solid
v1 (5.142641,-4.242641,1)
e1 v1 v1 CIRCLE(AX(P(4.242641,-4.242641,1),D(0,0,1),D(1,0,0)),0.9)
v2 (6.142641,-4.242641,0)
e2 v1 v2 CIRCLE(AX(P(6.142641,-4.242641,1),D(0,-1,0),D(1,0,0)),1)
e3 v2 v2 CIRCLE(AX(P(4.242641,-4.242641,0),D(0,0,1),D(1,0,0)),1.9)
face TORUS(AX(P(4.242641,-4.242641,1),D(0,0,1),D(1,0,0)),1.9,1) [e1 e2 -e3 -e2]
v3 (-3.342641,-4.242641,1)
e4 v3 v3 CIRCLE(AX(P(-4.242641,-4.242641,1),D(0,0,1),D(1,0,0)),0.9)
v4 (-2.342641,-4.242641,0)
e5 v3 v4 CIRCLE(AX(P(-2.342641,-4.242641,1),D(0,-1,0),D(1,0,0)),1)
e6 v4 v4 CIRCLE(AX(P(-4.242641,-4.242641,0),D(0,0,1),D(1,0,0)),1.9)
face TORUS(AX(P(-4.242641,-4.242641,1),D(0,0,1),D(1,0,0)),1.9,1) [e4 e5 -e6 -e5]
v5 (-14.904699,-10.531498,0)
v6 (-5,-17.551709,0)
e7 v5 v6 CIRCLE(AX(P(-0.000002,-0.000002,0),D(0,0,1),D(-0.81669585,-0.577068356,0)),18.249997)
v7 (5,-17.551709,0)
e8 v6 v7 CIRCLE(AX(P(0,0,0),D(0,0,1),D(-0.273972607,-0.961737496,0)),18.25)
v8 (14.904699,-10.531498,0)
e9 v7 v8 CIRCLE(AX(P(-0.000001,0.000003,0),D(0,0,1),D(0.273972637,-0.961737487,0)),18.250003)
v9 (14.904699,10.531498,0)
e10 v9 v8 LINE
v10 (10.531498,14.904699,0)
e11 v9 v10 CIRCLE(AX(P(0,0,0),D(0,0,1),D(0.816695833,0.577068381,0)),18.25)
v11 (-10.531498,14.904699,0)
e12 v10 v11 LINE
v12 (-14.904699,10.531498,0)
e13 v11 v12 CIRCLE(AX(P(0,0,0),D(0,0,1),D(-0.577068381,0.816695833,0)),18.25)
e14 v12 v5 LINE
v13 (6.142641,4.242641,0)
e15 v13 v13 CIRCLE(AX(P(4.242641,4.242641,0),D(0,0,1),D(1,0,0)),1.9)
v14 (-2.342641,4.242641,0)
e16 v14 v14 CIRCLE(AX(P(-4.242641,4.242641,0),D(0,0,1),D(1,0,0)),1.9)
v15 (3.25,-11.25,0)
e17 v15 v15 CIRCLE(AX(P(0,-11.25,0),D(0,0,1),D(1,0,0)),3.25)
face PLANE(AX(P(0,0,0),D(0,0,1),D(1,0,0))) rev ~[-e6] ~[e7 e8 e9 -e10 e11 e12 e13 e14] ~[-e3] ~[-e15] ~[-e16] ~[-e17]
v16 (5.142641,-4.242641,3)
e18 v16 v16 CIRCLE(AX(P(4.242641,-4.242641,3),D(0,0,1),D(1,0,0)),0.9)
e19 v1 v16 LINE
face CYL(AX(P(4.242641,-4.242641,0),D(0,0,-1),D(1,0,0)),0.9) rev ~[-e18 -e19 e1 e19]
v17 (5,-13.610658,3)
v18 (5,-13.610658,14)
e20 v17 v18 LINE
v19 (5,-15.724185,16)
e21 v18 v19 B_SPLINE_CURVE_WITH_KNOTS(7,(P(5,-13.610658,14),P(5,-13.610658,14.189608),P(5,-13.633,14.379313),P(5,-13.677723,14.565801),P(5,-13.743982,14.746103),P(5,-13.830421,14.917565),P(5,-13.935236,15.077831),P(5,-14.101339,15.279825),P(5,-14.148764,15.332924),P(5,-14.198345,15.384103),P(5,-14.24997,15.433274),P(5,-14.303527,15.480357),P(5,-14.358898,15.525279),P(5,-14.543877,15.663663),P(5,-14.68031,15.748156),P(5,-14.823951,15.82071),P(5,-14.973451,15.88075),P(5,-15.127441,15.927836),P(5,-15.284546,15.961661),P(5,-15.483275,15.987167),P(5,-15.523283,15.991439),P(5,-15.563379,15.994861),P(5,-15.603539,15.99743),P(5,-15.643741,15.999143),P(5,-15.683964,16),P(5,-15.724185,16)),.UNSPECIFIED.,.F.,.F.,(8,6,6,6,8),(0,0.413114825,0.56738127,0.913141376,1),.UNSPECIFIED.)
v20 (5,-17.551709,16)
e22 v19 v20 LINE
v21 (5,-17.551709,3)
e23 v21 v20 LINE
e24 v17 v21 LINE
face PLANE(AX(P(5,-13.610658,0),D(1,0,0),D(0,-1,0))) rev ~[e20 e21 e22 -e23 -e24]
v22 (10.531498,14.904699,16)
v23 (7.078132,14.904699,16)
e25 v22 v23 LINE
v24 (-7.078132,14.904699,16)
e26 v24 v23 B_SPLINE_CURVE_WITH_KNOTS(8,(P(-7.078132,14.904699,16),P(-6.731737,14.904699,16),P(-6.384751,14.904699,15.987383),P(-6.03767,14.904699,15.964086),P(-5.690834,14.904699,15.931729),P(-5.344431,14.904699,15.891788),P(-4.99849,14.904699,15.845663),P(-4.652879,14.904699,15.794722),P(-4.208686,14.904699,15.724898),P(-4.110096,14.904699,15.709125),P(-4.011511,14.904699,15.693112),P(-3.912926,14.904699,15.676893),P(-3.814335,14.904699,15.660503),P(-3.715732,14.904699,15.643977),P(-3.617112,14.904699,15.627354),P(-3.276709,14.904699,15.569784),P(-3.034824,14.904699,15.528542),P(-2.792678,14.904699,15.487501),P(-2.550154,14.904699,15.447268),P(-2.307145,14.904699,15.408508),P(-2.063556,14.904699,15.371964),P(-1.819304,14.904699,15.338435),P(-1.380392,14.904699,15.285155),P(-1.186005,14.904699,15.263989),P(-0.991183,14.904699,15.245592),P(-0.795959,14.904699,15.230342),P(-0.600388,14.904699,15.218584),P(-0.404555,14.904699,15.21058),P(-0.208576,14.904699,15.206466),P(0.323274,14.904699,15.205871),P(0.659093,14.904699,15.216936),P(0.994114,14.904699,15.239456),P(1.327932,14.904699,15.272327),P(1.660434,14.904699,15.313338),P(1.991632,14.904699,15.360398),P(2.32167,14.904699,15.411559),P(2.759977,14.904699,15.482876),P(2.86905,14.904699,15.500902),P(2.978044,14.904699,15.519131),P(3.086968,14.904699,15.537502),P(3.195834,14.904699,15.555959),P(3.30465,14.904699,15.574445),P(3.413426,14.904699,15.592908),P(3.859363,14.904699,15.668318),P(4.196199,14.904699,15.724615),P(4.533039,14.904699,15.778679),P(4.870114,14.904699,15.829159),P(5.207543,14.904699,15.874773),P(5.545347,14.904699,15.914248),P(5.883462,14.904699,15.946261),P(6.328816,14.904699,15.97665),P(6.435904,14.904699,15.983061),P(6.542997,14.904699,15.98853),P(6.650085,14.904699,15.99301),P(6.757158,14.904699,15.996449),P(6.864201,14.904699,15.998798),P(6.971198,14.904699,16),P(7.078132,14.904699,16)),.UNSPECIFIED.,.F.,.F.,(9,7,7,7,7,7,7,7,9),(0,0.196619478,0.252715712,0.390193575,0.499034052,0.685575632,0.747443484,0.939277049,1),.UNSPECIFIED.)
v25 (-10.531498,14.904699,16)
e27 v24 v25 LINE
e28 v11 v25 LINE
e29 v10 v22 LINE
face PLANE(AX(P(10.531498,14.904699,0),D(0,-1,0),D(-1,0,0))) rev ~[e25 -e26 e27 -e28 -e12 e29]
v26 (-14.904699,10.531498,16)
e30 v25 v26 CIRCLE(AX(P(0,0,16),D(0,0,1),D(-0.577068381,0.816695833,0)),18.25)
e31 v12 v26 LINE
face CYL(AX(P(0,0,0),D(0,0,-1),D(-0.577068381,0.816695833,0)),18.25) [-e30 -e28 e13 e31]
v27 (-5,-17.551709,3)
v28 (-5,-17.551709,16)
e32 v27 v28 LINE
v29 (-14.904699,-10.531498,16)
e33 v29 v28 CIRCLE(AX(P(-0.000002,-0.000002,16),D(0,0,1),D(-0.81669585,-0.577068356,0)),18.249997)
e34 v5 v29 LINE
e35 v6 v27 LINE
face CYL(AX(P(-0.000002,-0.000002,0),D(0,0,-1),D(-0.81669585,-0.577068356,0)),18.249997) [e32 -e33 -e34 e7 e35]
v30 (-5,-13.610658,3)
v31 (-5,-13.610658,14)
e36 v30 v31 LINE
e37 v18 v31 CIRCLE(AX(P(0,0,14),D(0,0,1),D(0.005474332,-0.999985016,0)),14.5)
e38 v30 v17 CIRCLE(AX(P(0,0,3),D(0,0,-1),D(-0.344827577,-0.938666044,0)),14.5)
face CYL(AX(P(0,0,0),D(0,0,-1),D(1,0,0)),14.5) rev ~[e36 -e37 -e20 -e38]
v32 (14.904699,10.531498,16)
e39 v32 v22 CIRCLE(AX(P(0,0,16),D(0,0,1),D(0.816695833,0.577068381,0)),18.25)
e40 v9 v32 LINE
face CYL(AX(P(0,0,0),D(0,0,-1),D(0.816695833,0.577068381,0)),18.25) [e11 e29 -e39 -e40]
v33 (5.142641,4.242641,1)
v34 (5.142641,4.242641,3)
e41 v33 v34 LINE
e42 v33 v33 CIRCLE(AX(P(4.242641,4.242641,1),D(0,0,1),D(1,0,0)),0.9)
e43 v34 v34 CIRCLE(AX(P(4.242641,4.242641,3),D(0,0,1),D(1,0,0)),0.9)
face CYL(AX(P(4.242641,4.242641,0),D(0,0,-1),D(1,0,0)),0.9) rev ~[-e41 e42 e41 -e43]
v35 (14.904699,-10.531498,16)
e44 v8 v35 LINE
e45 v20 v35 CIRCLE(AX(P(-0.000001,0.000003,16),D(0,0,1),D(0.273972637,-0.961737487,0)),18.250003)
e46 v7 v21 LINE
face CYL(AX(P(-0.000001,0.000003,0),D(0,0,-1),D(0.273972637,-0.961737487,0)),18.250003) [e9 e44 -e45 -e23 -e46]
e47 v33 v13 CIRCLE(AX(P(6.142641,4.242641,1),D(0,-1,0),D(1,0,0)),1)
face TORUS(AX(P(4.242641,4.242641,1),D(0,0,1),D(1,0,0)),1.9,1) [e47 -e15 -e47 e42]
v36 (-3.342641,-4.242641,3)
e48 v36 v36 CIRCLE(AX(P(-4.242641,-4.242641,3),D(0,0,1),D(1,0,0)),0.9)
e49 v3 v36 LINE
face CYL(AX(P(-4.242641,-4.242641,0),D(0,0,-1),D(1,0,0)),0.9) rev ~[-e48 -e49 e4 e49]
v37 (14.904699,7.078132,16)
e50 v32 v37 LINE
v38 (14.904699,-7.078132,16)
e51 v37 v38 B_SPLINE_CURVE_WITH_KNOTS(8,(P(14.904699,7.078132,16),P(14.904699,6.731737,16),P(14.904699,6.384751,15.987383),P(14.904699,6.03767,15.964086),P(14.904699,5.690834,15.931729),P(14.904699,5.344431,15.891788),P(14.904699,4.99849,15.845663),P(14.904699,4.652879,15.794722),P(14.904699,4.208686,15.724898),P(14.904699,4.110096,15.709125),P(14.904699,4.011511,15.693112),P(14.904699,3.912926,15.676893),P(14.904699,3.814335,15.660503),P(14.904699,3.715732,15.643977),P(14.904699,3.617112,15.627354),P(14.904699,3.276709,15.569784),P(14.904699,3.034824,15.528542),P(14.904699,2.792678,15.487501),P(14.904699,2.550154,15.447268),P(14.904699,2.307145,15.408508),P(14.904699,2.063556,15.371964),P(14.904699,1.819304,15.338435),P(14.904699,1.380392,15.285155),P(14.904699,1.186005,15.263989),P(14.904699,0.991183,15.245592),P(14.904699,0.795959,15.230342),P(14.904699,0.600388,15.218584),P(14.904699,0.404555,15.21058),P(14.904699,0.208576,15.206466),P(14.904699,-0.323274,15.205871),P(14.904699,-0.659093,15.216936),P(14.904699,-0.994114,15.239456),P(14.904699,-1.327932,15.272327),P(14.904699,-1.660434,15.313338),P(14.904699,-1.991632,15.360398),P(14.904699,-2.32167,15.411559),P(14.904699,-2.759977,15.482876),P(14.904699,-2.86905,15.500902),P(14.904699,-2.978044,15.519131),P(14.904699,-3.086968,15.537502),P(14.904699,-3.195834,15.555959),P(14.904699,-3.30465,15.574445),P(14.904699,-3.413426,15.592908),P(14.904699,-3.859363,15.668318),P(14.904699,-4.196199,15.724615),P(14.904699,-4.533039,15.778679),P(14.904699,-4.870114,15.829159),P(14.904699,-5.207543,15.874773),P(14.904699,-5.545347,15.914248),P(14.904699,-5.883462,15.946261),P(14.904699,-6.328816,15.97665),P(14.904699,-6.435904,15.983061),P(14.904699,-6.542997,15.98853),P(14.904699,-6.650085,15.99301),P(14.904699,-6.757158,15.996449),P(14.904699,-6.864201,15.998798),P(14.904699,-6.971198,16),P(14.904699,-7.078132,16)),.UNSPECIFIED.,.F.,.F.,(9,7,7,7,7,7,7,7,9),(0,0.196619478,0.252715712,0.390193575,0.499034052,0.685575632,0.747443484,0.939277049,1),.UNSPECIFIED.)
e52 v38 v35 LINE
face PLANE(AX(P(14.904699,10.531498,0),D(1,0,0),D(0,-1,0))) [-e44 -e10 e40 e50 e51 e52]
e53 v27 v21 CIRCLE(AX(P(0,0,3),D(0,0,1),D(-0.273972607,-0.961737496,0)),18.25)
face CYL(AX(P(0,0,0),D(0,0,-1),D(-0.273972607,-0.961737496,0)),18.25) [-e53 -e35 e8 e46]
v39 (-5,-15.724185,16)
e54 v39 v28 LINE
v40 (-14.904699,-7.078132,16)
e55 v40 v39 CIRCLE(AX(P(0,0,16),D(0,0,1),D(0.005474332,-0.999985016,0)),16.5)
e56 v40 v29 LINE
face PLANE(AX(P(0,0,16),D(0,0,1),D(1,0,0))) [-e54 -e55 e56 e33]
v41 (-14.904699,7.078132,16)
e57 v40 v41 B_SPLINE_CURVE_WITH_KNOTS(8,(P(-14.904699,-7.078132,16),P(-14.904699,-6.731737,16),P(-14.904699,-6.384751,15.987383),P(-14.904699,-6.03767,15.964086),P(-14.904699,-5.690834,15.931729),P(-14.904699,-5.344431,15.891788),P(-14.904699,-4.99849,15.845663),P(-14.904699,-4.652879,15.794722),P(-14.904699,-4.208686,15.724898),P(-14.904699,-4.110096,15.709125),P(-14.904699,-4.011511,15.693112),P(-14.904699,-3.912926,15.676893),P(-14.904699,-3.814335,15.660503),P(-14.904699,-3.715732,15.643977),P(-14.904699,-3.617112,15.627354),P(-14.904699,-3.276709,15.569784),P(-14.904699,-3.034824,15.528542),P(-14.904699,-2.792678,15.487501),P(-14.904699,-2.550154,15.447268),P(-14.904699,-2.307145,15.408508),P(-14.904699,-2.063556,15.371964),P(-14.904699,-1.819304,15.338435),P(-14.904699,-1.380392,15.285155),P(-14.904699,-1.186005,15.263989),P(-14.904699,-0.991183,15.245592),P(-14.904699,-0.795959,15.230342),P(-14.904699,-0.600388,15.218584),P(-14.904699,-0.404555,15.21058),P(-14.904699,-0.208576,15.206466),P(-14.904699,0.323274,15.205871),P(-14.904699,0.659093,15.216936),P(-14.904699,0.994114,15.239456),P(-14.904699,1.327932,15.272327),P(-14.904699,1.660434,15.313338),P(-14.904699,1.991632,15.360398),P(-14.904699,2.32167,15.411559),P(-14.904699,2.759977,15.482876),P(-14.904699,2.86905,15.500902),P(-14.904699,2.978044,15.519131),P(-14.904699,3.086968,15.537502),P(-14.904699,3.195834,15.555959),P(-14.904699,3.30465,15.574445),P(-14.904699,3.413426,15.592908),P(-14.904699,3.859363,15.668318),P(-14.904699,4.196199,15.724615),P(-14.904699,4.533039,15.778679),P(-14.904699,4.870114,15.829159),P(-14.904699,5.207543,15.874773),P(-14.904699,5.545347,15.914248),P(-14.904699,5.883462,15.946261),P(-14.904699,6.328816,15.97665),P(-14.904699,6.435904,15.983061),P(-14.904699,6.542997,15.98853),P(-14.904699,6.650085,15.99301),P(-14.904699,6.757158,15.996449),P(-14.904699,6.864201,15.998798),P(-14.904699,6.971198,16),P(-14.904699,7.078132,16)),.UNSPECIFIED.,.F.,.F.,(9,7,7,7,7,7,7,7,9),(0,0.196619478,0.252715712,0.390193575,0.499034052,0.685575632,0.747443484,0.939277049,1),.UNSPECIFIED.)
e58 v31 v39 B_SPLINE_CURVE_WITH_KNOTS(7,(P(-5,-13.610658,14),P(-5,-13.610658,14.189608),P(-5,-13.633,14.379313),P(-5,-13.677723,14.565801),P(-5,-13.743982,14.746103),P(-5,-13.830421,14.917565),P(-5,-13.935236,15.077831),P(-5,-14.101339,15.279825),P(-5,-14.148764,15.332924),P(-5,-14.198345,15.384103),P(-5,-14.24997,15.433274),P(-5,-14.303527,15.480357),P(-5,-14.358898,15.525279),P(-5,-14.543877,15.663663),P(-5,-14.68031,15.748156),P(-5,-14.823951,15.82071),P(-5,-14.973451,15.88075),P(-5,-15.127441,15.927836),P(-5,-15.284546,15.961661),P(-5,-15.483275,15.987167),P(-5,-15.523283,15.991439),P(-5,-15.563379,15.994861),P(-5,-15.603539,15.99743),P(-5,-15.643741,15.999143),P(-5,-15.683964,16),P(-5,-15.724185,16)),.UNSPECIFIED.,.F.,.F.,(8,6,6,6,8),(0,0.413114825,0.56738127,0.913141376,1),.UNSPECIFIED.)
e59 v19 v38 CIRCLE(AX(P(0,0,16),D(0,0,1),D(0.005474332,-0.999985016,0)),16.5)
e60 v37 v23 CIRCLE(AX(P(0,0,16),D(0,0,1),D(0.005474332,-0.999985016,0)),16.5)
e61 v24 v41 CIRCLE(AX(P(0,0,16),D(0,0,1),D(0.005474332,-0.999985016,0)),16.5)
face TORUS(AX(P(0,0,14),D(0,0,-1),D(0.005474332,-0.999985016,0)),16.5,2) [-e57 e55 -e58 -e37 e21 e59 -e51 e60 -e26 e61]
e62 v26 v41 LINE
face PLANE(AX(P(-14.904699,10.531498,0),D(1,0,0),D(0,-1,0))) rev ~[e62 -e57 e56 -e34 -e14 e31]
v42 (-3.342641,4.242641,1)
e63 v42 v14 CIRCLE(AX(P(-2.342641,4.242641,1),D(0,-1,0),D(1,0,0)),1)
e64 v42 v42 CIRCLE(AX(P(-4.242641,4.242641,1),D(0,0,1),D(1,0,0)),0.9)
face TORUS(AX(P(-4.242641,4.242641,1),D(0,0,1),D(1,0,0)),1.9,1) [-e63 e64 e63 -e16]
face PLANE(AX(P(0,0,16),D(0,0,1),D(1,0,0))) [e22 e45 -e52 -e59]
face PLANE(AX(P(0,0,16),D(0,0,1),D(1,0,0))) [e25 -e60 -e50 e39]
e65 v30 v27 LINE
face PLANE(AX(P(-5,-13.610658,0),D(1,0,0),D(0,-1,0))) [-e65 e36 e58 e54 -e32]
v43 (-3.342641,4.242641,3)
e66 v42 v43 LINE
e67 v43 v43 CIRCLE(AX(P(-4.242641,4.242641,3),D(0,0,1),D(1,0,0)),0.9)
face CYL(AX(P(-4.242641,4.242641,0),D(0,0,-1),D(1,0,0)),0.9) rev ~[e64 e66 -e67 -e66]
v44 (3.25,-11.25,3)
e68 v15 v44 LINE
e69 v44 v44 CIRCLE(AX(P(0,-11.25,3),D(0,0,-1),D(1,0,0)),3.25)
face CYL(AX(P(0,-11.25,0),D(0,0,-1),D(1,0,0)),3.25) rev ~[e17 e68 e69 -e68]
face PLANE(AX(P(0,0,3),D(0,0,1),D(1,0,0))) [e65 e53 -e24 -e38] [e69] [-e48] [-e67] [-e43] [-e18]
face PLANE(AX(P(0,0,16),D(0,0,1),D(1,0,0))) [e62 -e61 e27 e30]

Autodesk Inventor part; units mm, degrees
ref_plane "YZ Plane" through (0, 0, 0) normal (1, 0, 0) x (0, 1, 0)
ref_plane "XZ Plane" through (0, 0, 0) normal (0, 1, 0) x (-1, 0, 0)
ref_plane "XY Plane" through (0, 0, 0) normal (0, 0, 1) x (1, 0, 0)
sketch "Sketch1" plane through (0, 0, 0) normal (0, 0, 1) x (1, 0, 0)
  circle A0 centre (0, 0) radius 18.25 construction
  line L0 (12.904699, -12.904699) -> (-12.904699, 12.904699) construction
  line L1 (0, 29) -> (0, -41) construction
  line L2 (-75, 0) -> (78, 0) construction
  line L3 (-12.904699, -12.904699) -> (12.904699, 12.904699) construction
  line L4 (-12.904699, 12.904699) -> (12.904699, 12.904699) construction
  line L5 (12.904699, -12.904699) -> (12.904699, 12.904699) construction
  line L6 (-12.904699, -12.904699) -> (-12.904699, 12.904699) construction
  circle A1 centre (-4.242641, 4.242641) radius 0.9
  circle A2 centre (4.242641, 4.242641) radius 0.9
  circle A3 centre (-4.242641, -4.242641) radius 0.9
  circle A4 centre (4.242641, -4.242641) radius 0.9
  circle A5 centre (0, 0) radius 14.5
  line L7 (10.531498, 14.904699) -> (-10.531498, 14.904699)
  line L8 (-14.904699, 10.531498) -> (-14.904699, -10.531498)
  line L9 (14.904699, 10.531498) -> (14.904699, -10.531498)
  arc A6 (-10.531498, 14.904699) -> (-14.904699, 10.531498) centre (0, 0) ccw
  arc A7 (14.904699, 10.531498) -> (10.531498, 14.904699) centre (0, 0) ccw
  line L10 (-5, -13.610658) -> (-5, -17.551709)
  line L11 (5, -13.610658) -> (5, -17.551709)
  arc A8 (-14.904699, -10.531498) -> (-5, -17.551709) centre (0, 0) ccw
  arc A9 (5, -17.551709) -> (14.904699, -10.531498) centre (0, 0) ccw
  arc A10 (-5, -17.551709) -> (5, -17.551709) centre (0, 0) ccw
  circle A11 centre (0, -11.25) radius 3.25
  circle A12 centre (0, 0) radius 6 construction
  point P0 (5, -13.610658)
  point P1 (0, -14.5)
  point P2 (2.557391, -13.255556)
  point P3 (0, 0)
  dimension "d0" = 36.5
  dimension "d7" = 29
  dimension "d27" = 12
  dimension "d4" = 1.8
  dimension "d9" = 2
  dimension "d10" = 2
  dimension "d11" = 5
  dimension "d22" = 6.5
  dimension "d25" = 11.25
  dimension "d29" = 45
extrude "Extrusion1" add sketch "Sketch1" along normal blind 3 contours A11 | A5 | A5 L11 A10 L10
extrude "Extrusion2" add sketch "Sketch1" along normal blind 16 contours A5 L10 A8 L8 A6 L7 A7 L9 A9 L11
fillet "Fillet2" radius 1 4 edges at (3.3426, 4.2426, 0) (3.3426, -4.2426, 0) (-5.1426, -4.2426, 0) (-5.1426, 4.2426, 0)
extrude "Extrusion3" cut sketch "Sketch1" along normal blind 12 contours A11
fillet "Fillet3" radius 2 1 edges at (0, 14.5, 16)
properties part number "engine_cup"
